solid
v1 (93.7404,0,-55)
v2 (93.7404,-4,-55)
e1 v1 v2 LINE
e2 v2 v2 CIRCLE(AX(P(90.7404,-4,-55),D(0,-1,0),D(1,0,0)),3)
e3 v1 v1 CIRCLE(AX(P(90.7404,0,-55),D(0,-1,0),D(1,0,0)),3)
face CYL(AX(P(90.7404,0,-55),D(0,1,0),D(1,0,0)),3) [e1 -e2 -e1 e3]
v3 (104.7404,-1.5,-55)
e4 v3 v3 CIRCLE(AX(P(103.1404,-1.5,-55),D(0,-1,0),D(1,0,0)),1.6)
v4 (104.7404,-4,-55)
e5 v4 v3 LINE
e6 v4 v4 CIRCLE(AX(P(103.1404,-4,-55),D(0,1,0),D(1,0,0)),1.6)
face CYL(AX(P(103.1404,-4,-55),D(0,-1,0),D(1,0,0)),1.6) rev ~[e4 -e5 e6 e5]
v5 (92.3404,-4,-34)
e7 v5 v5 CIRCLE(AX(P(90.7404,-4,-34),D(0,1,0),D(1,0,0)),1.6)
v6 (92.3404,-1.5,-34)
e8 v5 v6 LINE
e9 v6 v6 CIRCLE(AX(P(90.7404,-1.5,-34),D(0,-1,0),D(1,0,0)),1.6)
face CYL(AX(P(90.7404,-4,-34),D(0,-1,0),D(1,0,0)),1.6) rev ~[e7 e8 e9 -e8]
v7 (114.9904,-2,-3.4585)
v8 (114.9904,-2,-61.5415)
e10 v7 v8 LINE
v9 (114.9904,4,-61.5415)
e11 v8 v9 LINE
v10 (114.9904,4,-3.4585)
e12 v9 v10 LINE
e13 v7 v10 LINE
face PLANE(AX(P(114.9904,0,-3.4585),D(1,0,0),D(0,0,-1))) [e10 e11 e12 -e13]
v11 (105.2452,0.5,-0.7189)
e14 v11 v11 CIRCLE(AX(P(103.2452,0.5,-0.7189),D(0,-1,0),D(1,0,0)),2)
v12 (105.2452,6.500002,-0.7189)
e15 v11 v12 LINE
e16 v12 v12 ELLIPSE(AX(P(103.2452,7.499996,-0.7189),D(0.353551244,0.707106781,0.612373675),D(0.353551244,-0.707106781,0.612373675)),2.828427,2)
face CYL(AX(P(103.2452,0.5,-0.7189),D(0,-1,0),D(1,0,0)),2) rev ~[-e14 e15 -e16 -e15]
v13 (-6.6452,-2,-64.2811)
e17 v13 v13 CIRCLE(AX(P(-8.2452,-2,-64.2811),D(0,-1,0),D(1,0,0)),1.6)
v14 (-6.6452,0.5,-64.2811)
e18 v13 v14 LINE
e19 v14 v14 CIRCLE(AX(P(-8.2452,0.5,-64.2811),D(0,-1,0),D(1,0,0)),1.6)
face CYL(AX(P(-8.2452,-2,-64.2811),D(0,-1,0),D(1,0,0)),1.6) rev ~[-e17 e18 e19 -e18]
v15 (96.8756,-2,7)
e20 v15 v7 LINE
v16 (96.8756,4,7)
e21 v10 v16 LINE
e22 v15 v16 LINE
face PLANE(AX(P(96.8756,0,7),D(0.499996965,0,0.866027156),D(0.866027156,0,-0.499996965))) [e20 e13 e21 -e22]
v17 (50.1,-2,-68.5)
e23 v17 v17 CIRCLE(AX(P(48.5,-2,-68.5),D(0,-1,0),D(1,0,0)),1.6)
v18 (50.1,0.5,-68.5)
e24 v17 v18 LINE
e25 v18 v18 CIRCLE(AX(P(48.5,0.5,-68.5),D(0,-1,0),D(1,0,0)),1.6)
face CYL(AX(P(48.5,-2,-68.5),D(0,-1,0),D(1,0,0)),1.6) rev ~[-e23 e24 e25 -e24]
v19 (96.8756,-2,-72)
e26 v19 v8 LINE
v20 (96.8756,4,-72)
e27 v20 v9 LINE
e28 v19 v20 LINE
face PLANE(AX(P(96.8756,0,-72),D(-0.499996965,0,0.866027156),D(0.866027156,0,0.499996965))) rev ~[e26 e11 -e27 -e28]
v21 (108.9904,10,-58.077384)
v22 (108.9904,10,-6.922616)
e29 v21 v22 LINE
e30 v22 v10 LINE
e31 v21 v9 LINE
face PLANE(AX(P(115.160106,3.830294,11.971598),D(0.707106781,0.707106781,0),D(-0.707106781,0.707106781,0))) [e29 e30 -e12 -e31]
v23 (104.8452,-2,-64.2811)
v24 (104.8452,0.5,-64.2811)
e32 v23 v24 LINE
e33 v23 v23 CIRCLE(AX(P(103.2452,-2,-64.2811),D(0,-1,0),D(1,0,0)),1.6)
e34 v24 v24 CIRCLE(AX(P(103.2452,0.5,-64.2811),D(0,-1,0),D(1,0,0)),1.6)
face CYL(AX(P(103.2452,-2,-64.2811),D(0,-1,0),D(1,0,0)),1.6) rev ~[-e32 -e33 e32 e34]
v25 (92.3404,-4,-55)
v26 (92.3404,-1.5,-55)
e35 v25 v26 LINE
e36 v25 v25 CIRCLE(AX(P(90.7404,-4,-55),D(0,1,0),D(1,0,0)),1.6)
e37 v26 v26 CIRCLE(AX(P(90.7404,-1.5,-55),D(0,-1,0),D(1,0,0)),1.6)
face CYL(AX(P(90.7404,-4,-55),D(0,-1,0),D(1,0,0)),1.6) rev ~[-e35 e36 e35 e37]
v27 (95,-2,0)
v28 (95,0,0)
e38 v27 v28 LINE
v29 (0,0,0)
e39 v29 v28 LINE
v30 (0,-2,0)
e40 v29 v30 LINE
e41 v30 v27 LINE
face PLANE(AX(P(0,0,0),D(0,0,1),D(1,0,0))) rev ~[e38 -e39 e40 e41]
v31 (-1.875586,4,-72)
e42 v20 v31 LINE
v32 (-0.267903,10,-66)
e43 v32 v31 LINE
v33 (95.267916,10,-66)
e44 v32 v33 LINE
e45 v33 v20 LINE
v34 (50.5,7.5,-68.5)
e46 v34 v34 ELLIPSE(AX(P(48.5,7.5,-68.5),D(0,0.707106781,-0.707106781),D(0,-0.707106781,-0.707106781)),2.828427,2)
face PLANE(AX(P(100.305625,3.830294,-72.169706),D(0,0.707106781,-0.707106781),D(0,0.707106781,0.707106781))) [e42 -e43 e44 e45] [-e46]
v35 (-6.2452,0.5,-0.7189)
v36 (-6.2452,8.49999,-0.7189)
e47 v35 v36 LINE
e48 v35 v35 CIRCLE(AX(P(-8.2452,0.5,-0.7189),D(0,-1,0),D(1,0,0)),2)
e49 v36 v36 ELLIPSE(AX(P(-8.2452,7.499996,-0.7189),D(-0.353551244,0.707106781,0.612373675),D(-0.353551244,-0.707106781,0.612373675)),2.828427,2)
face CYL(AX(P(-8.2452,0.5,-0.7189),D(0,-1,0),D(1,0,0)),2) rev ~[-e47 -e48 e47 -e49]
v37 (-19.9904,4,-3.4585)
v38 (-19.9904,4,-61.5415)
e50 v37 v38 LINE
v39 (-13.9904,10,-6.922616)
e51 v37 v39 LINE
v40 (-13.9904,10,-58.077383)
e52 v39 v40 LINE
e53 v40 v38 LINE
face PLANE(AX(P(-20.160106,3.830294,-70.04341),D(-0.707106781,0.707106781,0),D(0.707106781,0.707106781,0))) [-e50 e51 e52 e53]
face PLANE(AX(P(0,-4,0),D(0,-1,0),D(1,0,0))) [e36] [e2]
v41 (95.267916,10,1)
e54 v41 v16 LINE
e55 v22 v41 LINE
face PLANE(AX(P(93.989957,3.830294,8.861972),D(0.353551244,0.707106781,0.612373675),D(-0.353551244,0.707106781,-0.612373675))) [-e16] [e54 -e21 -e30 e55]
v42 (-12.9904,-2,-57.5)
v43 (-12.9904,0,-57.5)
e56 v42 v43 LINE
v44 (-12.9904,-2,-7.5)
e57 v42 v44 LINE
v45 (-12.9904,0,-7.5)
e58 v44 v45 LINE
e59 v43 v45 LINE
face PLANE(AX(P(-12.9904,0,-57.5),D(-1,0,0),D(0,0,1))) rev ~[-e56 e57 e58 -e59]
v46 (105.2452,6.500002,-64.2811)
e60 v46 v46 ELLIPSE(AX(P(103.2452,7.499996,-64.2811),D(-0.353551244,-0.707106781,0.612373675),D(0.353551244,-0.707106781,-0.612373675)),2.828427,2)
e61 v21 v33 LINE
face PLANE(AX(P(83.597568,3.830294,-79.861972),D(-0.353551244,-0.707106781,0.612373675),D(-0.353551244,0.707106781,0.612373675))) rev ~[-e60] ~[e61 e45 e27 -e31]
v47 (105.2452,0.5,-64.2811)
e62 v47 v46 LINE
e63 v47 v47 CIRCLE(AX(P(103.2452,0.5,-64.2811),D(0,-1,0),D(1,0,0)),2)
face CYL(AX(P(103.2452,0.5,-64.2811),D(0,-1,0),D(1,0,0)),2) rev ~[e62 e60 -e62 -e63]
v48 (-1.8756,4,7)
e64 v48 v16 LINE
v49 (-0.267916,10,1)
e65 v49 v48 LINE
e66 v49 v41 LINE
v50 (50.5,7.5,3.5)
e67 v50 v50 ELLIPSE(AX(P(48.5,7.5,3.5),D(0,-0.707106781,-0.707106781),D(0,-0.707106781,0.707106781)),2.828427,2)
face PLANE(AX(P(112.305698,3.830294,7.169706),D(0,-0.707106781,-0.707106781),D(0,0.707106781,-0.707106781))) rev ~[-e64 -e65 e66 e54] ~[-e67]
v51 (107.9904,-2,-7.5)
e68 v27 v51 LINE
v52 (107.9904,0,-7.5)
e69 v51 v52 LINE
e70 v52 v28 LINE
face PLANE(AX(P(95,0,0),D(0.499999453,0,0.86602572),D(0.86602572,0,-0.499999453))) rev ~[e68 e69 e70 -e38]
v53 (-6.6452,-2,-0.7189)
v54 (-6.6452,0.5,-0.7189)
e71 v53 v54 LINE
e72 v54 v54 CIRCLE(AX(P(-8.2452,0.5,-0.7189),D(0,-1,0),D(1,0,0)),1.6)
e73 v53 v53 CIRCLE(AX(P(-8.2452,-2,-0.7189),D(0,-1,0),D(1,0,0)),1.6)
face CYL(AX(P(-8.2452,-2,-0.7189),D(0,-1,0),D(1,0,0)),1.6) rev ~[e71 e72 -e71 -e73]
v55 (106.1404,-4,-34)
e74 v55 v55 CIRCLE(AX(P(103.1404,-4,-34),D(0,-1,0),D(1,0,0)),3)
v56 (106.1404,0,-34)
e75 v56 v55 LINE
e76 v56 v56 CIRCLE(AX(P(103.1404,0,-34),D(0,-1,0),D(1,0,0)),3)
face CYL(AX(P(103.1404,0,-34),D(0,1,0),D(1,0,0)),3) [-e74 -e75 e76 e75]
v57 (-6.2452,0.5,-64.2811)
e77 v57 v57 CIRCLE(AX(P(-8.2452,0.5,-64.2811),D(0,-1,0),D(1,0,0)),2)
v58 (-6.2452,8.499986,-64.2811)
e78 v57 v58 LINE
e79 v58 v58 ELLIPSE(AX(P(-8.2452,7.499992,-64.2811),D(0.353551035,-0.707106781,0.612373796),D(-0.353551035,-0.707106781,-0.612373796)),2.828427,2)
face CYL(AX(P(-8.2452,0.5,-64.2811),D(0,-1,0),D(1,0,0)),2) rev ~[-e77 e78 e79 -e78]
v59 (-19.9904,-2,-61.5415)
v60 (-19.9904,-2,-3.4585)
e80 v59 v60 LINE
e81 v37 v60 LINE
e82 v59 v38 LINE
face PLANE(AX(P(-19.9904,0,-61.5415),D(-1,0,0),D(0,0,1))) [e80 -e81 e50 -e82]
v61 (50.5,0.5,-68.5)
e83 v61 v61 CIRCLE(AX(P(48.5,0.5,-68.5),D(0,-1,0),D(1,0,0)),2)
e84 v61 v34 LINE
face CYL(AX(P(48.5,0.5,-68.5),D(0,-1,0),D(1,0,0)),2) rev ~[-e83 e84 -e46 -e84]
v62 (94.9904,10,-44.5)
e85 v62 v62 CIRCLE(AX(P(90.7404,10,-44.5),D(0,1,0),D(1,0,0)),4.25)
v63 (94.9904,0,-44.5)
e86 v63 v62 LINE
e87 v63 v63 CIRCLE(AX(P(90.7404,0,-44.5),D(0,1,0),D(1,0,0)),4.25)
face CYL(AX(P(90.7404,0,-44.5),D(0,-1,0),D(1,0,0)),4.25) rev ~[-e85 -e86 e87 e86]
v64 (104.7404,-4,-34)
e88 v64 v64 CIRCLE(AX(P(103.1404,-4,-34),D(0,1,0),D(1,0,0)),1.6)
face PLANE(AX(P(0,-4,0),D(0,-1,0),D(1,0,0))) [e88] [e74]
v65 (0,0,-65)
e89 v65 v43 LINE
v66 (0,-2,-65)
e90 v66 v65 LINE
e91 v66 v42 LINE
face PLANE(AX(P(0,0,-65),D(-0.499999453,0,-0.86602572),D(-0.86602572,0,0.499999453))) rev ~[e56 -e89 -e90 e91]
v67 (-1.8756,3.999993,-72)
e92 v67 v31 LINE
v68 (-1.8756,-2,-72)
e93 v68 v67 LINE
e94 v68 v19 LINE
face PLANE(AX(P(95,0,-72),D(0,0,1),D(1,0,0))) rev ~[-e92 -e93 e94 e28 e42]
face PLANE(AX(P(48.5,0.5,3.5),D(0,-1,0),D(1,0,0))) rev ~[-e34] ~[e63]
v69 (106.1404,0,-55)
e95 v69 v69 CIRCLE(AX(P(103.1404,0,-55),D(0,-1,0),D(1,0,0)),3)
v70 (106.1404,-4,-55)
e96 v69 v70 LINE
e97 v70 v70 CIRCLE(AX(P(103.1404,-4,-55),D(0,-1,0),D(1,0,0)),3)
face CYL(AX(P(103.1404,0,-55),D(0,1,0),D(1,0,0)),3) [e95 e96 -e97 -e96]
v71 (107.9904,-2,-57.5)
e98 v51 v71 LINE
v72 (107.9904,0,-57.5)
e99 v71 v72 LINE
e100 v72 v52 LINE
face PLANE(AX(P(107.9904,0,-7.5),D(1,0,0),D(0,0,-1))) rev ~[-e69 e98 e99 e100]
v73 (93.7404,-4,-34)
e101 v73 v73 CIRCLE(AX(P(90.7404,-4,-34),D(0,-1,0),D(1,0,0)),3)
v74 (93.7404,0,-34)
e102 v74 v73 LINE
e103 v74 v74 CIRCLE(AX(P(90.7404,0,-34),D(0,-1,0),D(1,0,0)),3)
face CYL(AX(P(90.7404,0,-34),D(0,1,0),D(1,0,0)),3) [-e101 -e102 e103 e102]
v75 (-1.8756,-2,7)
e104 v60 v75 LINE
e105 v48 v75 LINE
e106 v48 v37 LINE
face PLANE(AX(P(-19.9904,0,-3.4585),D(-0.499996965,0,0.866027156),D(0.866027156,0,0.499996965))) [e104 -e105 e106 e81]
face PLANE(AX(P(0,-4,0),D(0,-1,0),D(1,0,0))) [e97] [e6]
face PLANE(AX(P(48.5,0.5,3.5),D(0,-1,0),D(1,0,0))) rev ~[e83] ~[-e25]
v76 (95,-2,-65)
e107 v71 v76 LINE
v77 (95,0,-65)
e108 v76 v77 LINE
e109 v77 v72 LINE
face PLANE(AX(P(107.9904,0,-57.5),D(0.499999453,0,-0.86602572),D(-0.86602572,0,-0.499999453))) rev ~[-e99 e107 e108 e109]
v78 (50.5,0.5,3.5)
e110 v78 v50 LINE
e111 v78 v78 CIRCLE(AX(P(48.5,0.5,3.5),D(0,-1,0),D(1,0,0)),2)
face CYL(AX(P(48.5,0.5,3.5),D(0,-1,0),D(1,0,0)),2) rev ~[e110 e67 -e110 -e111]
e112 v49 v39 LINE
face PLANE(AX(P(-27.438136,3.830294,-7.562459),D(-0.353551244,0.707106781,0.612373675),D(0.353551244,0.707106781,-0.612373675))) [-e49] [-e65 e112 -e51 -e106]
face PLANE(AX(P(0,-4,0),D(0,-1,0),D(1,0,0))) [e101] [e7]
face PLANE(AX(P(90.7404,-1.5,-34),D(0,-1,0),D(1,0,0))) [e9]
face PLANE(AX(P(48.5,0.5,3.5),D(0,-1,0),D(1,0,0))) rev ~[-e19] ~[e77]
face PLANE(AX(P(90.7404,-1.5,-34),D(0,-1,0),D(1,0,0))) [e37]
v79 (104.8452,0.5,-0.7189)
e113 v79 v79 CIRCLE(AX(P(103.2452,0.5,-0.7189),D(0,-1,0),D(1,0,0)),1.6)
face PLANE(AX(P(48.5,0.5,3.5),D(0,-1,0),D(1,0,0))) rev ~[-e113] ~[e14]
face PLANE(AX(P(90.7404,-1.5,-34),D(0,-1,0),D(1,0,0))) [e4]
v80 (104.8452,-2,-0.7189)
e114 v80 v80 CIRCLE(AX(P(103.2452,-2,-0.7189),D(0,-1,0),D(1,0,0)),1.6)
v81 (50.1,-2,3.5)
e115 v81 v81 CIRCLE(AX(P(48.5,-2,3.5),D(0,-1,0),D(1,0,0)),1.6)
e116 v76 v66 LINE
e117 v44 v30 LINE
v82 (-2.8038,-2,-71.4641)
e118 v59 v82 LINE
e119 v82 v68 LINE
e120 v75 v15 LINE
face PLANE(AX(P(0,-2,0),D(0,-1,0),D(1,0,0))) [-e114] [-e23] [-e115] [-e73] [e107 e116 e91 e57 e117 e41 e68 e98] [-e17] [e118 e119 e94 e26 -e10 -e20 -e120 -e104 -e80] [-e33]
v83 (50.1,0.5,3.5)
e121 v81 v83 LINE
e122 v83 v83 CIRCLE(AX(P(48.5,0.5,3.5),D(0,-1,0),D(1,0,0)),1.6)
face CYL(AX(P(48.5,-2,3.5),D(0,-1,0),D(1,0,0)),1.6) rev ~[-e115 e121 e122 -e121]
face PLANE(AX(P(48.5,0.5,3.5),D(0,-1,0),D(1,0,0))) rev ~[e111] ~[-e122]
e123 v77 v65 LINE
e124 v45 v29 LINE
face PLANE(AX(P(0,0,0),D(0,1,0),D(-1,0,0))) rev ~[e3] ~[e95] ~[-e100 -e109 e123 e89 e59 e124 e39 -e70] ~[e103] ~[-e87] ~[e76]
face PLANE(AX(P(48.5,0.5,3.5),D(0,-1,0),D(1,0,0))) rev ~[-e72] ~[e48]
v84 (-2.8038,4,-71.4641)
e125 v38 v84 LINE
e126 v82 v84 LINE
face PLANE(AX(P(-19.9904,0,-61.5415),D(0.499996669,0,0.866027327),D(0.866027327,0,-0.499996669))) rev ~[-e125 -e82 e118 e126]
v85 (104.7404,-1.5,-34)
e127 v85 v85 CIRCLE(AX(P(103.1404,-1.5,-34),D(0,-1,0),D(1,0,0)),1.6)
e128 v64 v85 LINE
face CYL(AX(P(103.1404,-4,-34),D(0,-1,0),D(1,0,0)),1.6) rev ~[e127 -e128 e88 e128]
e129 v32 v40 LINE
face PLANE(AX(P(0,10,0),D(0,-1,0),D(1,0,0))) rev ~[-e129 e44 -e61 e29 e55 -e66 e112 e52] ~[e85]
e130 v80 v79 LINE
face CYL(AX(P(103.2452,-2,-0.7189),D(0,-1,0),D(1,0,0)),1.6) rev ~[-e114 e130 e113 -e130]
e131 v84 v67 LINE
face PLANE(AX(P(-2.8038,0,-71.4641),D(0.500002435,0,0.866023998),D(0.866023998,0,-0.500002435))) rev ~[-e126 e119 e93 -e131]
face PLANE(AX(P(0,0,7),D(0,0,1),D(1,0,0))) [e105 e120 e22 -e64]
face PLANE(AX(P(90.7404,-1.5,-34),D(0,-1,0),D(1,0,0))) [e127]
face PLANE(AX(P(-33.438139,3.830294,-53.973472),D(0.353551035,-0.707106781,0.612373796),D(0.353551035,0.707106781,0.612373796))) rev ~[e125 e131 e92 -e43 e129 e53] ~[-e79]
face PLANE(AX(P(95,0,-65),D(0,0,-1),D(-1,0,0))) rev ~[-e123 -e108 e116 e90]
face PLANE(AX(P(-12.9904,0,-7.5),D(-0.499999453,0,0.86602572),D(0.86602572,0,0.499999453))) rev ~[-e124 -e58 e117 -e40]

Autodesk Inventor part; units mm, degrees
ref_plane "YZ Plane" through (0, 0, 0) normal (1, 0, 0) x (0, 1, 0)
ref_plane "XZ Plane" through (0, 0, 0) normal (0, 1, 0) x (-1, 0, 0)
sketch "Sketch5" plane through (0, 0, 0) normal (0, 1, 0) x (-1, 0, 0)
  line L0 (0, 0) -> (-95, 0)
  line L1 (-95, 0) -> (-95, -65)
  line L2 (-95, -65) -> (0, -65)
  line L3 (0, -65) -> (0, 0)
  line L4 (0, -65) -> (12.9904, -57.5)
  line L5 (12.9904, -57.5) -> (12.9904, -7.5)
  line L6 (12.9904, -7.5) -> (0, 0)
  line L7 (-95, -65) -> (-107.9904, -57.5)
  line L8 (-107.9904, -57.5) -> (-107.9904, -7.5)
  line L9 (-107.9904, -7.5) -> (-95, 0)
  dimension "d23" = 95
  dimension "d24" = 65
  dimension "d25" = 15
  dimension "d26" = 15
  dimension "d27" = 120
  dimension "d28" = 15
  dimension "d29" = 15
  dimension "d30" = 120
extrude "Extrusion3" add sketch "Sketch5" along normal blind 10
sketch "Sketch6" plane through (0, 0, 0) normal (0, -1, 0) x (1, 0, 0)
  line L0 (0, 7) -> (87, 7)
  line L1 (95, -72) -> (8, -72)
  line L2 (0, 0) -> (95, 0) projected
  line L3 (95, -65) -> (0, -65) projected
  line L4 (96.8756, 7) -> (114.9904, -3.4585)
  line L5 (95, 0) -> (107.9904, -7.5) projected
  line L6 (114.9904, -3.4585) -> (114.9904, -61.5415)
  line L7 (107.9904, -7.5) -> (107.9904, -57.5) projected
  line L8 (96.8756, -72) -> (114.9904, -61.5415)
  line L9 (107.9904, -57.5) -> (95, -65) projected
  line L10 (107.9904, -57.5) -> (95, -65) projected
  line L11 (87, 7) -> (96.8756, 7)
  line L12 (95, -72) -> (96.8756, -72)
  line L13 (0, 7) -> (-1.8756, 7)
  line L14 (-19.9904, -3.4585) -> (-1.8756, 7)
  line L15 (-19.9904, -61.5415) -> (-2.8038, -71.4641)
  line L16 (0, -65) -> (-12.9904, -57.5) projected
  line L17 (-12.9904, -7.5) -> (0, 0) projected
  line L18 (-19.9904, -61.5415) -> (-19.9904, -3.4585)
  line L19 (-12.9904, -57.5) -> (-12.9904, -7.5) projected
  line L20 (0, -65) -> (-12.9904, -57.5) projected
  line L21 (-12.9904, -7.5) -> (-12.9904, -57.5)
  line L22 (-12.9904, -57.5) -> (0, -65)
  line L23 (95, -65) -> (0, -65) projected
  line L24 (0, -65) -> (95, -65)
  line L25 (95, -65) -> (107.9904, -57.5)
  line L26 (107.9904, -7.5) -> (107.9904, -57.5)
  line L27 (95, 0) -> (107.9904, -7.5) projected
  line L28 (107.9904, -7.5) -> (95, 0)
  line L29 (0, 0) -> (-12.9904, -7.5)
  line L30 (95, 0) -> (0, 0)
  line L31 (8, -72) -> (-1.8756, -72)
  line L32 (-2.8038, -71.4641) -> (-1.8756, -72)
  dimension "d33" = 7
  dimension "d34" = 7
  dimension "d35" = 7
  dimension "d36" = 7
  dimension "d37" = 7
  dimension "d38" = 7
  dimension "d39" = 7
  dimension "d40" = 7
extrude "Extrusion4" add sketch "Sketch6" along normal blind 2 and the other way blind 10
chamfer "Chamfer1" distance 6 angle 45 8 edges at (47.5, 10, 7) (-10.933, 10, 1.7707) (-19.9904, 10, -32.5) (-10.933, 10, -66.7707) (47.5, 10, -72) (105.933, 10, -66.7707) (114.9904, 10, -32.5) (105.933, 10, 1.7707)
sketch "Sketch7" plane through (0, 0, 0) normal (0, -1, 0) x (1, 0, 0)
  line L0 (86.4904, -40.25) -> (94.9904, -40.25)
  line L1 (94.9904, -40.25) -> (94.9904, -48.75)
  line L2 (94.9904, -48.75) -> (86.4904, -48.75)
  line L3 (86.4904, -48.75) -> (86.4904, -40.25)
  line L4 (96.8756, 7) -> (-1.8756, 7) projected
  line L5 (114.9904, -61.5415) -> (114.9904, -3.4585) projected
  circle A0 centre (90.7404, -55) radius 3
  circle A1 centre (90.7404, -34) radius 3
  circle A2 centre (103.1404, -34) radius 3
  circle A3 centre (103.1404, -55) radius 3
  circle A4 centre (90.7404, -44.5) radius 4.25
  circle A5 centre (46.5, 2.8174) radius 1.834
  circle A6 centre (46.5, -64.297) radius 1.834
  line L6 (-1.8756, -72) -> (96.8756, -72) projected
  point P0 (0, 0)
  dimension "d48" = 8.5
  dimension "d50" = 20
  dimension "d51" = 6.25
  dimension "d52" = 8.15
  dimension "d53" = 12.4
  dimension "d54" = 0
  dimension "d55" = 21
  dimension "d56" = 12.4
  dimension "d57" = 0
  dimension "d58" = 0
  dimension "d59" = 6
  dimension "d61" = 8.5
  dimension "d107" = 27.5
sketch "Sketch9" plane through (0, -2, 0) normal (0, -1, 0) x (1, 0, 0)
  circle A0 centre (-8.2452, -0.7189) radius 1.6
  line L0 (0, -65) -> (-12.9904, -57.5) projected
  line L1 (0, -65) -> (-1.8756, -72) projected
  line L2 (95, -65) -> (0, -65) projected
  line L3 (107.9904, -7.5) -> (107.9904, -57.5) projected
  line L4 (0, 0) -> (95, 0) projected
  line L5 (-12.9904, -7.5) -> (-16.4904, -1.4378)
  line L6 (-19.9904, -3.4585) -> (-1.8756, 7) projected
  line L7 (0, 0) -> (-3.5, 6.0622)
  line L8 (-12.9904, -57.5) -> (-19.9904, -61.5415) projected
  line L9 (-12.9904, -57.5) -> (-15.4904, -61.8301)
  line L10 (0, -65) -> (-2.5, -69.3301)
  line L11 (95, -65) -> (97.5, -69.3301)
  line L12 (95, 0) -> (98.5, 6.0622)
  line L13 (96.8756, 7) -> (114.9904, -3.4585) projected
  line L14 (107.9904, -7.5) -> (114.9904, -3.4585) projected
  line L15 (107.9904, -7.5) -> (111.4904, -1.4378)
  line L16 (107.9904, -57.5) -> (111.4904, -63.5622)
  line L17 (96.8756, -72) -> (114.9904, -61.5415) projected
  line L18 (107.9904, -57.5) -> (95, -65) projected
  line L19 (95, 0) -> (107.9904, -7.5) projected
  circle A1 centre (-8.2452, -64.2811) radius 1.6
  circle A2 centre (103.2452, -64.2811) radius 1.6
  circle A3 centre (103.2452, -0.7189) radius 1.6
  circle A4 centre (48.5, 3.5) radius 1.6
  circle A5 centre (48.5, -68.5) radius 1.6
  line L20 (95, -65) -> (95, -72)
  line L21 (-1.8756, -72) -> (96.8756, -72) projected
  line L22 (95, 0) -> (95, 7)
  line L23 (96.8756, 7) -> (-1.8756, 7) projected
  dimension "d62" = 90
  dimension "d63" = 90
  dimension "d64" = 90
  dimension "d65" = 7.5
  dimension "d66" = 3.5
  dimension "d67" = 3.2
  dimension "d68" = 7.5
  dimension "d69" = 3.5
  dimension "d70" = 3.5
  dimension "d71" = 7.5
  dimension "d72" = 7.5
  dimension "d73" = 3.5
  dimension "d76" = 3.5
  dimension "d77" = 46.5
  dimension "d78" = 3.5
  dimension "d79" = 46.5
extrude "Extrusion6" cut sketch "Sketch9" against normal blind 2.5 contours A0 | A1 | A2 | A3 | A4 | A5
sketch "Sketch13" plane through (48.5, 0.5, 3.5) normal (0, -1, 0) x (1, 0, 0)
  circle A0 centre (0, 0) radius 2
  circle A1 centre (54.7452, -4.2189) radius 2
  circle A2 centre (54.7452, -67.7811) radius 2
  circle A3 centre (0, -72) radius 2
  circle A4 centre (-56.7452, -67.7811) radius 2
  circle A5 centre (-56.7452, -4.2189) radius 2
  circle A6 centre (-56.7452, -4.2189) radius 1.6 projected
  circle A7 centre (0, 0) radius 1.6 projected
  circle A8 centre (54.7452, -4.2189) radius 1.6 projected
  circle A9 centre (54.7452, -67.7811) radius 1.6 projected
  circle A10 centre (0, -72) radius 1.6 projected
  circle A11 centre (-56.7452, -67.7811) radius 1.6 projected
  point P0 (-48.5, -3.5)
  dimension "d90" = 4
  dimension "d91" = 4
  dimension "d92" = 4
  dimension "d93" = 4
  dimension "d94" = 4
  dimension "d95" = 4
extrude "Extrusion7" cut sketch "Sketch13" against normal blind 10 contours A0 | A1 | A2 | A3 | A4 | A5 | A6 | A7 | A8 | A9 | A10 | A11
extrude "Extrusion8" add sketch "Sketch7" along normal blind 4 contours A0 | A1 | A2 | A3
sketch "Sketch14" plane through (0, 0, 0) normal (0, -1, 0) x (1, 0, 0)
  line L0 (86.4904, -48.75) -> (94.9904, -48.75)
  line L1 (94.9904, -48.75) -> (94.9904, -40.25)
  line L2 (94.9904, -40.25) -> (86.4904, -40.25)
  line L3 (86.4904, -40.25) -> (86.4904, -48.75)
  line L4 (95, -65) -> (0, -65) projected
  line L5 (107.9904, -7.5) -> (107.9904, -57.5) projected
  circle A0 centre (90.7404, -44.5) radius 4.25
  circle A1 centre (90.7404, -55) radius 3 projected
  point P0 (0, 0)
  dimension "d100" = 8.5
  dimension "d101" = 8.5
  dimension "d103" = 13
  dimension "d104" = 8.5
  dimension "d108" = 9.25
extrude "Extrusion9" cut sketch "Sketch14" against normal blind 10 contours A0
ref_plane "Work Plane1" through (0, -6, 0) normal (0, -1, 0) x (1, 0, 0)
sketch "Sketch15" plane through (90.7404, -4, -34) normal (0, -1, 0) x (1, 0, 0)
  circle A0 centre (0, 0) radius 1.6
  circle A1 centre (12.4, 0) radius 1.6
  line L0 (12.4, 0) -> (0, 0)
  line L1 (0, 0) -> (0, -21)
  line L2 (0, -21) -> (12.4, -21)
  line L3 (12.4, -21) -> (12.4, 0)
  circle A2 centre (12.4, -21) radius 1.6
  circle A3 centre (0, -21) radius 1.6
  point P0 (-90.7404, 34)
  dimension "d110" = 3.2
  dimension "d111" = 3.2
  dimension "d112" = 12.4
  dimension "d113" = 21
  dimension "d114" = 3.2
  dimension "d115" = 3.2
extrude "Extrusion10" cut sketch "Sketch15" against normal blind 2.5 contours L0 L1 A0 | A0 L1 L0 | L0 L3 A1 | A1 L3 L0 | A3 L2 L1 | L1 L2 A3 | A2 L2 L3 | L3 L2 A2
properties part number "Topv4"
